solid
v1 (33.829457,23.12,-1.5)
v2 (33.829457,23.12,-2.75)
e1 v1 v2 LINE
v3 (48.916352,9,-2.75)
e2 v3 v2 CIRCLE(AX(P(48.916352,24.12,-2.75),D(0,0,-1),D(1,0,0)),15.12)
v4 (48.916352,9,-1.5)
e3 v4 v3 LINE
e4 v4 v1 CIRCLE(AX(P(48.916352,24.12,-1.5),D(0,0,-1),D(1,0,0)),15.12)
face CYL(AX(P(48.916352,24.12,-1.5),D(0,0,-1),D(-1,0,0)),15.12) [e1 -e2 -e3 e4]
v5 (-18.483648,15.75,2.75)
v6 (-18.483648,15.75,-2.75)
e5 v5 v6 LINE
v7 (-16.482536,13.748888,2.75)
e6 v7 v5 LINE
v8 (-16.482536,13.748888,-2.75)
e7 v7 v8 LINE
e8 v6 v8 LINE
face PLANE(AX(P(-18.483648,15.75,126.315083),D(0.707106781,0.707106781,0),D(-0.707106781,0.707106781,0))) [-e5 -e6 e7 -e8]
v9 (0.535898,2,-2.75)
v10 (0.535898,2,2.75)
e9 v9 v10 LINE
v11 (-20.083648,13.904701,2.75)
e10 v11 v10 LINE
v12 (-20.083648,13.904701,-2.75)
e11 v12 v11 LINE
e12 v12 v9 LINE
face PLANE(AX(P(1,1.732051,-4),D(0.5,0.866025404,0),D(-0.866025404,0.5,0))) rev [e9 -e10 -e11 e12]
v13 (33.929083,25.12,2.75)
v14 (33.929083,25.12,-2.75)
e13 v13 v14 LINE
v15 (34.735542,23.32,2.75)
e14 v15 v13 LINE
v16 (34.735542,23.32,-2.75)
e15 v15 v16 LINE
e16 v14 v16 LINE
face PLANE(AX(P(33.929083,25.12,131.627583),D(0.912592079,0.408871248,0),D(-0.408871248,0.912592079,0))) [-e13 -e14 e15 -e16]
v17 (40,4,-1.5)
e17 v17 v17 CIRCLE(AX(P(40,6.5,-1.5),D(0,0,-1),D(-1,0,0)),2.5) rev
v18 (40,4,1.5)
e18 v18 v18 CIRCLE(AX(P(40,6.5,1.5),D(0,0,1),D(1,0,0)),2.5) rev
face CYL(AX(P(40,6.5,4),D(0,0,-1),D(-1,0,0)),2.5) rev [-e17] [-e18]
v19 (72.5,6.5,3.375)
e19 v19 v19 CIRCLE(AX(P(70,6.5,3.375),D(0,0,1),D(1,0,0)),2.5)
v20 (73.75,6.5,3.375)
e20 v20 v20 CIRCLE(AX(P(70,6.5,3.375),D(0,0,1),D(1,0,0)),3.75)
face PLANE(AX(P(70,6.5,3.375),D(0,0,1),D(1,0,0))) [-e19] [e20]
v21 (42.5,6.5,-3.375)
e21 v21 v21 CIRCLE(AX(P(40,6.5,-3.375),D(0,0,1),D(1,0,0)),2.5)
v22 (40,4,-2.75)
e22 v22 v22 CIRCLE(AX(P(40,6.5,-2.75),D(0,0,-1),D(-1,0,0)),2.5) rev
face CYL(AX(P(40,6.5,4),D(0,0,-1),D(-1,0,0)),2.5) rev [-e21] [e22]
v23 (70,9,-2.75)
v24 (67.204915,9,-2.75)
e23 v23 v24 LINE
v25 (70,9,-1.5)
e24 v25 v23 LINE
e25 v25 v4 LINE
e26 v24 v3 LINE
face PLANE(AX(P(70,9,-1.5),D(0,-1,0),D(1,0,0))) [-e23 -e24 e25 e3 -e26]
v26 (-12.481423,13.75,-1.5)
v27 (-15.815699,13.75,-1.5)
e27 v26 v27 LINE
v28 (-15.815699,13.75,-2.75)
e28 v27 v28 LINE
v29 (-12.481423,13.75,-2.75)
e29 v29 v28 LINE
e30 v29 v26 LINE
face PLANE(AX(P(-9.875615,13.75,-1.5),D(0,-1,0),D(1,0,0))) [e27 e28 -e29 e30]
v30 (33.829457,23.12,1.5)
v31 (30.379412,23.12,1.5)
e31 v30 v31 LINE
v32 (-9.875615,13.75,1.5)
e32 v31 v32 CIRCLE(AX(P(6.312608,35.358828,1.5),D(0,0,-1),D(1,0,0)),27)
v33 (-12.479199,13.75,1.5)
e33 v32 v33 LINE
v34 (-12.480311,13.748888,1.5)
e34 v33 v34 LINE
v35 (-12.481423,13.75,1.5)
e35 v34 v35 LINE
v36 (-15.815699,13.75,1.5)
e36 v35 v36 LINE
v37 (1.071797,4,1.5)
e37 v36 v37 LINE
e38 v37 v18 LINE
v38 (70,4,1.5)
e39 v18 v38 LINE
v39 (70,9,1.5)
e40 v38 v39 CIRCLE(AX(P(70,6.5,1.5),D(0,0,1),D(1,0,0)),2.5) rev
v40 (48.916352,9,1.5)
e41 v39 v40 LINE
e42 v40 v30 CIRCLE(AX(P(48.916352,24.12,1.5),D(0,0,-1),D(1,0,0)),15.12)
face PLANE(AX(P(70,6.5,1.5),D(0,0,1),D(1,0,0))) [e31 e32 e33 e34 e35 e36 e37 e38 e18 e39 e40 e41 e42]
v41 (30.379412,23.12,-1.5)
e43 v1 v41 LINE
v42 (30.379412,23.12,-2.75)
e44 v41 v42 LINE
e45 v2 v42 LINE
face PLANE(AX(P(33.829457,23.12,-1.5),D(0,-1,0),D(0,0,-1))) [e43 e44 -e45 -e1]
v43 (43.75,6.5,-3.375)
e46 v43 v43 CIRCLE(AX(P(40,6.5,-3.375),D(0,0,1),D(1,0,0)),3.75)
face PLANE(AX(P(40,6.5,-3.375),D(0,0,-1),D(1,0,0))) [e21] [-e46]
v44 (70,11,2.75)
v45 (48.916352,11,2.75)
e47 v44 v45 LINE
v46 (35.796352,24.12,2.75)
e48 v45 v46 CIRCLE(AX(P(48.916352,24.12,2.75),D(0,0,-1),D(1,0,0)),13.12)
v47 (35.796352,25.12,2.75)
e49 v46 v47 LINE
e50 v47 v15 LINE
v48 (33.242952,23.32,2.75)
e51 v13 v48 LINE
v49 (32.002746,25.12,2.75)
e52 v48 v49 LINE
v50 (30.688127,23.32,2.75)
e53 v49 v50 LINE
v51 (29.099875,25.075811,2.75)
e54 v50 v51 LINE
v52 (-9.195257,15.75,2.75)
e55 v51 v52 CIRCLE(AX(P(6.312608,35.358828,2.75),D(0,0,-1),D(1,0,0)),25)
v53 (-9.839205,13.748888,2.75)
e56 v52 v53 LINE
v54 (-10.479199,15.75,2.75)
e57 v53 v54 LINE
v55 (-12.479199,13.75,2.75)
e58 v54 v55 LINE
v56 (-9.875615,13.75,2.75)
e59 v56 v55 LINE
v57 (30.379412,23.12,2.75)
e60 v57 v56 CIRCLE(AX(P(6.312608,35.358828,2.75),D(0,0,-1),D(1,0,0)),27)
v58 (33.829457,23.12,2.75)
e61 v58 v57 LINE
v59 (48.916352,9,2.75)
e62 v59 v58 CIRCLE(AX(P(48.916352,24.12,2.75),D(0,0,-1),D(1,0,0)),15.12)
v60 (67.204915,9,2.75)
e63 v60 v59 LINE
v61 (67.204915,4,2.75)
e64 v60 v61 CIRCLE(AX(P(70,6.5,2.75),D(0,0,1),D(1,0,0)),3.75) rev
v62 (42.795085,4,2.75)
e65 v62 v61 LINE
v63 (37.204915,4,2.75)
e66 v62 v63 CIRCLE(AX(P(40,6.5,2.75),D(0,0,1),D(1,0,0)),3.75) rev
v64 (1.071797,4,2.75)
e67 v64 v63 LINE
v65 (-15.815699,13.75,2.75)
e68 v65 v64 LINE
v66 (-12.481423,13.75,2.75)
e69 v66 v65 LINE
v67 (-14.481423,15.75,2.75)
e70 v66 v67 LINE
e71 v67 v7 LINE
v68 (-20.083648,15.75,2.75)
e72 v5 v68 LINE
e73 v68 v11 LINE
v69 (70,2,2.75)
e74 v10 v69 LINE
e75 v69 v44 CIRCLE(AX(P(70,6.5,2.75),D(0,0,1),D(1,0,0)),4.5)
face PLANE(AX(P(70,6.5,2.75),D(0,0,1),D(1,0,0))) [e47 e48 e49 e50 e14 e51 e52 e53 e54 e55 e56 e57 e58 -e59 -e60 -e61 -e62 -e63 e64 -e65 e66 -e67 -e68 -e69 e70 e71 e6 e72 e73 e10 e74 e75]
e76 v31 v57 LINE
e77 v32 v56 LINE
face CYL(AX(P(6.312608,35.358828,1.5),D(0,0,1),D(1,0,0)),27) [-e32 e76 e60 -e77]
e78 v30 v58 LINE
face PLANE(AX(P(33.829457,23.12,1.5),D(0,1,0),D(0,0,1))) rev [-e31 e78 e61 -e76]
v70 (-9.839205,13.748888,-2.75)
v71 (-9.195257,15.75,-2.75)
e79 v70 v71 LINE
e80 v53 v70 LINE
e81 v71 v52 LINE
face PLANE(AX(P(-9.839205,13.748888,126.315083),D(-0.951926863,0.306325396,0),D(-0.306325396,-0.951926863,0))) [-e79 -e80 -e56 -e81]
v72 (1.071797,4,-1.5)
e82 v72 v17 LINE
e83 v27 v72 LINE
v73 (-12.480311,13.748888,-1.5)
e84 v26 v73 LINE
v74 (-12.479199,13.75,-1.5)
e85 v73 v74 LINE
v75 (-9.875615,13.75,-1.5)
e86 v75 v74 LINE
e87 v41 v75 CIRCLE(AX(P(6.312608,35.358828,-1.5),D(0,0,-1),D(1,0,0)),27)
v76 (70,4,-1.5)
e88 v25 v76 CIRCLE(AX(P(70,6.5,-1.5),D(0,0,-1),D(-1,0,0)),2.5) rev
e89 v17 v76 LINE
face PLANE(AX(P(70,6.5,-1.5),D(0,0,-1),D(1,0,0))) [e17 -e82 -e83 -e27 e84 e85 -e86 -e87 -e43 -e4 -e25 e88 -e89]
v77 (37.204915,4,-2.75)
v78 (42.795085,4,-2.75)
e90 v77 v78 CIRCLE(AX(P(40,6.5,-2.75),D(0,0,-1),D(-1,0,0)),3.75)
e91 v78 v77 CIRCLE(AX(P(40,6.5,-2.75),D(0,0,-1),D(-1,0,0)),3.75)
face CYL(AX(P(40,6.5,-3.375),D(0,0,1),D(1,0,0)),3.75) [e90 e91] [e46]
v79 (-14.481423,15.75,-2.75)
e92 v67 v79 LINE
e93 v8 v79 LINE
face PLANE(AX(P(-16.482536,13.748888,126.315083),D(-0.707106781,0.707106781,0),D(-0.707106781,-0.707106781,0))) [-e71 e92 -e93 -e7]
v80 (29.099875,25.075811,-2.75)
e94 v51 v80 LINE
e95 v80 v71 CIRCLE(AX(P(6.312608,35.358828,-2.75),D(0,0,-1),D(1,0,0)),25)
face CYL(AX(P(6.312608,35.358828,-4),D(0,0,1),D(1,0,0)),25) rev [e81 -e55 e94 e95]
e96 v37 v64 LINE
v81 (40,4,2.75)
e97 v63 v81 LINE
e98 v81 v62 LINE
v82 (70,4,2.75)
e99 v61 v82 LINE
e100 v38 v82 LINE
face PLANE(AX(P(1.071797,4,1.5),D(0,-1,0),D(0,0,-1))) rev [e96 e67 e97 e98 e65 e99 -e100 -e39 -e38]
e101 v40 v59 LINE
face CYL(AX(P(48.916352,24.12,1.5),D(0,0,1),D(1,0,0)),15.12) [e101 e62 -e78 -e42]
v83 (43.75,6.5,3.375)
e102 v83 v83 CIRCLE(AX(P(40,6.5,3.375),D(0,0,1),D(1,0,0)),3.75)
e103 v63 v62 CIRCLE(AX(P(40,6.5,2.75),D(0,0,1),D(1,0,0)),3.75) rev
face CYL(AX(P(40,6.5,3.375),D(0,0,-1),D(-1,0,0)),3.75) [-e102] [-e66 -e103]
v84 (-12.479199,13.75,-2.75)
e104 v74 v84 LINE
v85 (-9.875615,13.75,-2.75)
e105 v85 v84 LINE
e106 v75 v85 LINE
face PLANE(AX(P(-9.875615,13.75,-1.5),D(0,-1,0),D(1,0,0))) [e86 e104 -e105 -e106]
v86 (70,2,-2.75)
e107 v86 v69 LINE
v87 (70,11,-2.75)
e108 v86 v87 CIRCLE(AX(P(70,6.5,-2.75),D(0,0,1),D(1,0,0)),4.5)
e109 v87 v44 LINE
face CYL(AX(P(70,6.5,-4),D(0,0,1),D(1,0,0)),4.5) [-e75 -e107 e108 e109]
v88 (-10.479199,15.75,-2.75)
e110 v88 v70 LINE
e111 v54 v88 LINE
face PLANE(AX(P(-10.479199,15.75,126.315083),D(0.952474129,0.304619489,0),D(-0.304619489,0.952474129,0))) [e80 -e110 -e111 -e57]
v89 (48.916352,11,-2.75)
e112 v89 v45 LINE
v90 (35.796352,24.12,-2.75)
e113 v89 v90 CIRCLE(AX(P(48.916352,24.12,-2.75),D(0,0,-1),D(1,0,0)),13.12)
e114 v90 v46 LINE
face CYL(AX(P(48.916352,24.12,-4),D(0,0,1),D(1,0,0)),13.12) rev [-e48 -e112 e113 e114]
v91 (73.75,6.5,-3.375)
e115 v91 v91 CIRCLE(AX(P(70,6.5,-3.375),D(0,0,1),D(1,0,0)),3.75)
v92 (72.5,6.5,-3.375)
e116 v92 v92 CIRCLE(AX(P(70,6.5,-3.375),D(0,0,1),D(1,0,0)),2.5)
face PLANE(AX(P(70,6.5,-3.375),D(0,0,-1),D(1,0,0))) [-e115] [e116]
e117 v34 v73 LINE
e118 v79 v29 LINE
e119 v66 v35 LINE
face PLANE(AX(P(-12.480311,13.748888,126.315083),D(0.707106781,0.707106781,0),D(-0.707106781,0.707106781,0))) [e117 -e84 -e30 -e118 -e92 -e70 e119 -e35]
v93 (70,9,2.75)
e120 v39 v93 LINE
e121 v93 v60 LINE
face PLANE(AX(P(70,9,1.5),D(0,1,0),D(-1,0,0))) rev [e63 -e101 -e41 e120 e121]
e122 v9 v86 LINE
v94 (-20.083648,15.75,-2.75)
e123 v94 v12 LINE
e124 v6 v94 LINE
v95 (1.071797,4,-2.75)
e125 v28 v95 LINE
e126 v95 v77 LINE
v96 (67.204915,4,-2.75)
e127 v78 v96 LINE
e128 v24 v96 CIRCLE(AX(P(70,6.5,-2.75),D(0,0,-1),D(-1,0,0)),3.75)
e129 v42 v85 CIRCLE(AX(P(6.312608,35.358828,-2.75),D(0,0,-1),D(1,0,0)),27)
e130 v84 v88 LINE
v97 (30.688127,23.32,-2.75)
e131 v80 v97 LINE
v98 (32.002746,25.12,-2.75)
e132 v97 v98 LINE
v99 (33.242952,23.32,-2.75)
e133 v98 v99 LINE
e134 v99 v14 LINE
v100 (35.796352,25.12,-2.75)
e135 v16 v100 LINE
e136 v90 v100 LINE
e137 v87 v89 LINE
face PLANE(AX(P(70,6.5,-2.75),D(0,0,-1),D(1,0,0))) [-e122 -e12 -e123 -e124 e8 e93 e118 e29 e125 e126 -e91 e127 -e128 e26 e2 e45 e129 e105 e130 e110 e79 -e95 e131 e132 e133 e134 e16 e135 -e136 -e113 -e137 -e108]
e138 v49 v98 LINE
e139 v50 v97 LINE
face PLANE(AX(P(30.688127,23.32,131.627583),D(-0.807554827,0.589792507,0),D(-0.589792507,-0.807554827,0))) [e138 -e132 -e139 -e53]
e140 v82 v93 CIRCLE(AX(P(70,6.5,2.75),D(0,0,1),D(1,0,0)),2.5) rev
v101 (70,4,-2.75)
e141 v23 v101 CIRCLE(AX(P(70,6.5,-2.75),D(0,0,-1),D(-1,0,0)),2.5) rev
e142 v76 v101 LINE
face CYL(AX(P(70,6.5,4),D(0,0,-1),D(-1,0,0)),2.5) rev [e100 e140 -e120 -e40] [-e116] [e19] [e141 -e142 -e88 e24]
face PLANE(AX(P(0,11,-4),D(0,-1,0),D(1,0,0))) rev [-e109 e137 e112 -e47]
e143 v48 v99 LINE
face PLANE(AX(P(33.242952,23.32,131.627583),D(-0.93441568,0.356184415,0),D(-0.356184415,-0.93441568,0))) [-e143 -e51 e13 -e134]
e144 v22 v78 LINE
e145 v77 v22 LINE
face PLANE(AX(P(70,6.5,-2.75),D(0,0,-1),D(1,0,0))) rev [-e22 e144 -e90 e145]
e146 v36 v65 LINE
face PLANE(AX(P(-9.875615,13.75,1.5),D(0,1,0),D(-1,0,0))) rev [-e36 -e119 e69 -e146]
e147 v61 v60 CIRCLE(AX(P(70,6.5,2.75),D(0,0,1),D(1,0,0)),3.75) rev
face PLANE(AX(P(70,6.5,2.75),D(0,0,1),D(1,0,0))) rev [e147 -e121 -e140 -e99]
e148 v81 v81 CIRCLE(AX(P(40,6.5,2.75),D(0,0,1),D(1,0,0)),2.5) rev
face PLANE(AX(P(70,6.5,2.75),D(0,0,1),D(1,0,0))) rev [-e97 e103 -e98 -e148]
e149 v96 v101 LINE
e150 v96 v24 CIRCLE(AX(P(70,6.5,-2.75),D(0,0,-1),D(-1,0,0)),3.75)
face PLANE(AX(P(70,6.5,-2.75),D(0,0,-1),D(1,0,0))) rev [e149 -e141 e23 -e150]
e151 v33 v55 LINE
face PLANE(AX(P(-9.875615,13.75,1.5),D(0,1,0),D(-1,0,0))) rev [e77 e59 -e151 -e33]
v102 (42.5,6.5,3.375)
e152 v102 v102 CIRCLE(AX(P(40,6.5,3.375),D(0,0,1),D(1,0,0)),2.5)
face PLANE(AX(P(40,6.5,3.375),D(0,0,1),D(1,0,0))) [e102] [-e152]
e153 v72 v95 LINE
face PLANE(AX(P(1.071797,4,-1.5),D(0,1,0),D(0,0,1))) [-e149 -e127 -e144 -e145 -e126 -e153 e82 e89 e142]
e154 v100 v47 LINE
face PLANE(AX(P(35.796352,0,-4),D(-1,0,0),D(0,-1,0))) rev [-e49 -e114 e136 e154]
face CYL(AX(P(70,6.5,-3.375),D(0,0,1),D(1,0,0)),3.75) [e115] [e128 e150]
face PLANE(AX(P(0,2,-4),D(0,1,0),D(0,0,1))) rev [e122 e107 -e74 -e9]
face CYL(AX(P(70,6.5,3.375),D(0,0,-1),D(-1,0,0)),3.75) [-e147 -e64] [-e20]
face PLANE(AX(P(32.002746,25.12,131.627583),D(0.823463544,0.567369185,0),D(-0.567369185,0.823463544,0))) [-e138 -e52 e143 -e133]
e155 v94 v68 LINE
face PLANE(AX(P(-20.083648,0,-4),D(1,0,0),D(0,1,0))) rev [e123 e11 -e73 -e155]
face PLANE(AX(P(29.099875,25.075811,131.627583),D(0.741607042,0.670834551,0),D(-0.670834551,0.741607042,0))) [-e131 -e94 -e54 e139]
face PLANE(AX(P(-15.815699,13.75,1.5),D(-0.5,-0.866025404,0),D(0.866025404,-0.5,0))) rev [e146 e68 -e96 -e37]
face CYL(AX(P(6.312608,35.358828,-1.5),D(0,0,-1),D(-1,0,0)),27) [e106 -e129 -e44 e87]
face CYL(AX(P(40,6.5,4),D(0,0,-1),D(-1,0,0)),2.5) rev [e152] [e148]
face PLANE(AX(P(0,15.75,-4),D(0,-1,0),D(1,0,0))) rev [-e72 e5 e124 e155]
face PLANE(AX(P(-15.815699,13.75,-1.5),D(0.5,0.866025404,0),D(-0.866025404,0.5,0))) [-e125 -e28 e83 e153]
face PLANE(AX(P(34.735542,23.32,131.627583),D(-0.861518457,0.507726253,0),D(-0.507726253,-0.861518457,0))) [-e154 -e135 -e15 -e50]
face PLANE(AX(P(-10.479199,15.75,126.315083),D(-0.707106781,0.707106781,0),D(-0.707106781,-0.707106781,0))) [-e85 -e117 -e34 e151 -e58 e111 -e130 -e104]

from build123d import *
from build123d.topology import SkipClean

# Parameters (mm, degrees)
BOSS_EXTRUDE1_DEPTH     = 4
SKETCH3_R               = 2.5
CUT_EXTRUDE1_DEPTH      = 82.558227053
CUT_EXTRUDE2_DEPTH      = 1.25
SKETCH5_R               = 3.75
SKETCH5_R_2             = 2.5
BOSS_EXTRUDE2_DEPTH     = 0.625
CUT_EXTRUDE3_DEPTH      = 82.558227053
CUT_EXTRUDE4_START      = -1.25
CUT_EXTRUDE4_DEPTH      = 1.25
CUT_EXTRUDE5_DEPTH      = 79.859241849
CUT_EXTRUDE5_DEPTH_BACK = 79.859241849
CUT_EXTRUDE6_DEPTH      = 79.859241849
CUT_EXTRUDE6_DEPTH_BACK = 79.859241849


with BuildPart() as part:
    # Sketch1 → Boss-Extrude1 (new, symmetric)
    with BuildSketch(Plane.XY):
        with BuildLine():
            Line((0, 0), (70, 0))
            ThreePointArc((70, 0), (76.5, 6.5), (70, 13))
            Line((70, 13), (48.916352203, 13))
            ThreePointArc((48.916352203, 13), (41.053324797, 16.256972593), (37.796352203, 24.12))
            Line((37.796352203, 24.12), (37.796352203, 27.12))
            Line((37.796352203, 27.12), (27.786352203, 27.12))
            ThreePointArc((27.786352203, 27.12), (12.065558159, 13.089935965), (-8.483647797, 17.75))
            Line((-8.483647797, 17.75), (-22.083647797, 17.75))
            Line((-22.083647797, 17.75), (-22.083647797, 12.75))
            Line((-22.083647797, 12.75), (0, 0))
        make_face()
    extrude(amount=BOSS_EXTRUDE1_DEPTH, both=True)

    # Sketch3 → Cut-Extrude1 (cut, through all)
    with BuildSketch(Plane(origin=(0, 0, -4), x_dir=(-1, 0, 0), z_dir=(0, 0, -1))):
        with Locations((-70, 6.5)):
            Circle(SKETCH3_R)
        with Locations((-40, 6.5)):
            Circle(SKETCH3_R)
    extrude(amount=-CUT_EXTRUDE1_DEPTH, mode=Mode.SUBTRACT)

    # Sketch4 → Cut-Extrude2 (cut)
    with BuildSketch(Plane.XY.offset(4)):
        with BuildLine():
            Line((-20.083647797, 13.904700538), (0.535898385, 2))
            Line((0.535898385, 2), (70, 2))
            ThreePointArc((70, 2), (74.5, 6.5), (70, 11))
            Line((70, 11), (48.916352203, 11))
            ThreePointArc((48.916352203, 11), (39.639111234, 14.842759031), (35.796352203, 24.12))
            Line((35.796352203, 24.12), (35.796352203, 25.12))
            Line((35.796352203, 25.12), (29.119764251, 25.12))
            ThreePointArc((29.119764251, 25.12), (12.251390397, 11.074453376), (-9.195256898, 15.75))
            Line((-9.195256898, 15.75), (-20.083647797, 15.75))
            Line((-20.083647797, 15.75), (-20.083647797, 13.904700538))
        make_face()
    cut_extrude2 = extrude(amount=-CUT_EXTRUDE2_DEPTH, mode=Mode.SUBTRACT)

    # Sketch5 → Boss-Extrude2 (add, symmetric)
    # profile 1 of 2: a face of its own
    with SkipClean():  # the faces are left unmerged after this step: merging them gives an invalid solid
        with BuildSketch(Plane.XY.offset(2.75)):
            with Locations((40, 6.5)):
                Circle(SKETCH5_R)
            with Locations((40, 6.5)):
                Circle(SKETCH5_R_2, mode=Mode.SUBTRACT)
        # profile 2 of 2: a face of its own
        with BuildSketch(Plane.XY.offset(2.75)):
            with Locations((70, 6.5)):
                Circle(SKETCH5_R)
            with Locations((70, 6.5)):
                Circle(SKETCH5_R_2, mode=Mode.SUBTRACT)
        boss_extrude2 = extrude(amount=BOSS_EXTRUDE2_DEPTH, both=True)

    # Mirror1: Cut-Extrude2, Boss-Extrude2 across plane
    add(cut_extrude2.mirror(Plane.XY), mode=Mode.SUBTRACT)
    add(boss_extrude2.mirror(Plane.XY))

    # Sketch7 → Cut-Extrude3 (cut, through all)
    with BuildSketch(Plane.XY.offset(4)):
        with BuildLine():
            Line((-22.083647797, 17.75), (-22.083647797, 12.75))
            Line((-22.083647797, 12.75), (0, 0))
            Line((0, 0), (70, 0))
            ThreePointArc((70, 0), (76.5, 6.5), (70, 13))
            Line((70, 13), (48.916352203, 13))
            ThreePointArc((48.916352203, 13), (41.053324797, 16.256972593), (37.796352203, 24.12))
            Line((37.796352203, 24.12), (37.796352203, 27.12))
            Line((37.796352203, 27.12), (27.786352203, 27.12))
            ThreePointArc((27.786352203, 27.12), (12.065558159, 13.089935965), (-8.483647797, 17.75))
            Line((-8.483647797, 17.75), (-22.083647797, 17.75))
        make_face()
        with BuildLine():
            Line((70, 2), (0.535898385, 2))
            Line((0.535898385, 2), (-20.083647797, 13.904700538))
            Line((-20.083647797, 13.904700538), (-20.083647797, 15.75))
            Line((-20.083647797, 15.75), (-9.195256898, 15.75))
            ThreePointArc((-9.195256898, 15.75), (12.251390397, 11.074453376), (29.119764251, 25.12))
            Line((29.119764251, 25.12), (35.796352203, 25.12))
            Line((35.796352203, 25.12), (35.796352203, 24.12))
            ThreePointArc((35.796352203, 24.12), (39.639111234, 14.842759031), (48.916352203, 11))
            Line((48.916352203, 11), (70, 11))
            ThreePointArc((70, 11), (74.5, 6.5), (70, 2))
        make_face(mode=Mode.SUBTRACT)
    cut_extrude3 = extrude(amount=-CUT_EXTRUDE3_DEPTH, mode=Mode.SUBTRACT)

    # Sketch8 → Cut-Extrude4 (cut)
    with BuildSketch(Plane.XY.offset(2.75).offset(CUT_EXTRUDE4_START)):
        with BuildLine():
            Line((-15.815698604, 13.75), (1.07179677, 4))
            Line((1.07179677, 4), (70, 4))
            ThreePointArc((70, 4), (72.5, 6.5), (70, 9))
            Line((70, 9), (48.916352203, 9))
            ThreePointArc((48.916352203, 9), (38.584498546, 13.080652193), (33.829457228, 23.12))
            Line((33.829457228, 23.12), (30.37941216, 23.12))
            ThreePointArc((30.37941216, 23.12), (12.433656393, 9.061817656), (-9.875614934, 13.75))
            Line((-9.875614934, 13.75), (-15.815698604, 13.75))
        make_face()
    cut_extrude4 = extrude(amount=CUT_EXTRUDE4_DEPTH, mode=Mode.SUBTRACT)

    # Mirror2: Cut-Extrude3, Cut-Extrude4 across plane
    add(cut_extrude3.mirror(Plane.XY), mode=Mode.SUBTRACT)
    add(cut_extrude4.mirror(Plane.XY), mode=Mode.SUBTRACT)

    # Sketch9 → Cut-Extrude5 (cut, two sides: drawn at the far end of the back side and taken through both)
    with BuildSketch(Plane.XY.offset(2.75).offset(-CUT_EXTRUDE5_DEPTH_BACK)):
        Polygon((-158.483427763, 155.749779966), (-18.483647797, 15.75), (-16.482535606, 13.748887809), (-14.481423415, 15.75), (-12.480311224, 13.748887809), (-10.479199033, 15.75), (-9.839204987, 13.748887809), (-9.195256898, 15.75), (51.453981857, 204.221606933), (-37.628855278, 590.05026742), (-247.566264898, 541.578440454), align=None)
    extrude(amount=CUT_EXTRUDE5_DEPTH + CUT_EXTRUDE5_DEPTH_BACK, mode=Mode.SUBTRACT)

    # Sketch11 → Cut-Extrude6 (cut, two sides: drawn at the far end of the back side and taken through both)
    with BuildSketch(Plane.XY.offset(2.75).offset(-CUT_EXTRUDE6_DEPTH_BACK)):
        Polygon((-58.744613452, 122.187820826), (29.099875124, 25.075811319), (30.688127166, 23.32), (32.002745662, 25.12), (33.242951791, 23.32), (33.9290832, 25.12), (34.735542366, 23.32), (35.796352203, 25.12), (102.28212416, 137.934177705), (76.793604285, 398.587053404), (-84.233133328, 382.840696525), align=None)
    extrude(amount=CUT_EXTRUDE6_DEPTH + CUT_EXTRUDE6_DEPTH_BACK, mode=Mode.SUBTRACT)


solid = part.part
